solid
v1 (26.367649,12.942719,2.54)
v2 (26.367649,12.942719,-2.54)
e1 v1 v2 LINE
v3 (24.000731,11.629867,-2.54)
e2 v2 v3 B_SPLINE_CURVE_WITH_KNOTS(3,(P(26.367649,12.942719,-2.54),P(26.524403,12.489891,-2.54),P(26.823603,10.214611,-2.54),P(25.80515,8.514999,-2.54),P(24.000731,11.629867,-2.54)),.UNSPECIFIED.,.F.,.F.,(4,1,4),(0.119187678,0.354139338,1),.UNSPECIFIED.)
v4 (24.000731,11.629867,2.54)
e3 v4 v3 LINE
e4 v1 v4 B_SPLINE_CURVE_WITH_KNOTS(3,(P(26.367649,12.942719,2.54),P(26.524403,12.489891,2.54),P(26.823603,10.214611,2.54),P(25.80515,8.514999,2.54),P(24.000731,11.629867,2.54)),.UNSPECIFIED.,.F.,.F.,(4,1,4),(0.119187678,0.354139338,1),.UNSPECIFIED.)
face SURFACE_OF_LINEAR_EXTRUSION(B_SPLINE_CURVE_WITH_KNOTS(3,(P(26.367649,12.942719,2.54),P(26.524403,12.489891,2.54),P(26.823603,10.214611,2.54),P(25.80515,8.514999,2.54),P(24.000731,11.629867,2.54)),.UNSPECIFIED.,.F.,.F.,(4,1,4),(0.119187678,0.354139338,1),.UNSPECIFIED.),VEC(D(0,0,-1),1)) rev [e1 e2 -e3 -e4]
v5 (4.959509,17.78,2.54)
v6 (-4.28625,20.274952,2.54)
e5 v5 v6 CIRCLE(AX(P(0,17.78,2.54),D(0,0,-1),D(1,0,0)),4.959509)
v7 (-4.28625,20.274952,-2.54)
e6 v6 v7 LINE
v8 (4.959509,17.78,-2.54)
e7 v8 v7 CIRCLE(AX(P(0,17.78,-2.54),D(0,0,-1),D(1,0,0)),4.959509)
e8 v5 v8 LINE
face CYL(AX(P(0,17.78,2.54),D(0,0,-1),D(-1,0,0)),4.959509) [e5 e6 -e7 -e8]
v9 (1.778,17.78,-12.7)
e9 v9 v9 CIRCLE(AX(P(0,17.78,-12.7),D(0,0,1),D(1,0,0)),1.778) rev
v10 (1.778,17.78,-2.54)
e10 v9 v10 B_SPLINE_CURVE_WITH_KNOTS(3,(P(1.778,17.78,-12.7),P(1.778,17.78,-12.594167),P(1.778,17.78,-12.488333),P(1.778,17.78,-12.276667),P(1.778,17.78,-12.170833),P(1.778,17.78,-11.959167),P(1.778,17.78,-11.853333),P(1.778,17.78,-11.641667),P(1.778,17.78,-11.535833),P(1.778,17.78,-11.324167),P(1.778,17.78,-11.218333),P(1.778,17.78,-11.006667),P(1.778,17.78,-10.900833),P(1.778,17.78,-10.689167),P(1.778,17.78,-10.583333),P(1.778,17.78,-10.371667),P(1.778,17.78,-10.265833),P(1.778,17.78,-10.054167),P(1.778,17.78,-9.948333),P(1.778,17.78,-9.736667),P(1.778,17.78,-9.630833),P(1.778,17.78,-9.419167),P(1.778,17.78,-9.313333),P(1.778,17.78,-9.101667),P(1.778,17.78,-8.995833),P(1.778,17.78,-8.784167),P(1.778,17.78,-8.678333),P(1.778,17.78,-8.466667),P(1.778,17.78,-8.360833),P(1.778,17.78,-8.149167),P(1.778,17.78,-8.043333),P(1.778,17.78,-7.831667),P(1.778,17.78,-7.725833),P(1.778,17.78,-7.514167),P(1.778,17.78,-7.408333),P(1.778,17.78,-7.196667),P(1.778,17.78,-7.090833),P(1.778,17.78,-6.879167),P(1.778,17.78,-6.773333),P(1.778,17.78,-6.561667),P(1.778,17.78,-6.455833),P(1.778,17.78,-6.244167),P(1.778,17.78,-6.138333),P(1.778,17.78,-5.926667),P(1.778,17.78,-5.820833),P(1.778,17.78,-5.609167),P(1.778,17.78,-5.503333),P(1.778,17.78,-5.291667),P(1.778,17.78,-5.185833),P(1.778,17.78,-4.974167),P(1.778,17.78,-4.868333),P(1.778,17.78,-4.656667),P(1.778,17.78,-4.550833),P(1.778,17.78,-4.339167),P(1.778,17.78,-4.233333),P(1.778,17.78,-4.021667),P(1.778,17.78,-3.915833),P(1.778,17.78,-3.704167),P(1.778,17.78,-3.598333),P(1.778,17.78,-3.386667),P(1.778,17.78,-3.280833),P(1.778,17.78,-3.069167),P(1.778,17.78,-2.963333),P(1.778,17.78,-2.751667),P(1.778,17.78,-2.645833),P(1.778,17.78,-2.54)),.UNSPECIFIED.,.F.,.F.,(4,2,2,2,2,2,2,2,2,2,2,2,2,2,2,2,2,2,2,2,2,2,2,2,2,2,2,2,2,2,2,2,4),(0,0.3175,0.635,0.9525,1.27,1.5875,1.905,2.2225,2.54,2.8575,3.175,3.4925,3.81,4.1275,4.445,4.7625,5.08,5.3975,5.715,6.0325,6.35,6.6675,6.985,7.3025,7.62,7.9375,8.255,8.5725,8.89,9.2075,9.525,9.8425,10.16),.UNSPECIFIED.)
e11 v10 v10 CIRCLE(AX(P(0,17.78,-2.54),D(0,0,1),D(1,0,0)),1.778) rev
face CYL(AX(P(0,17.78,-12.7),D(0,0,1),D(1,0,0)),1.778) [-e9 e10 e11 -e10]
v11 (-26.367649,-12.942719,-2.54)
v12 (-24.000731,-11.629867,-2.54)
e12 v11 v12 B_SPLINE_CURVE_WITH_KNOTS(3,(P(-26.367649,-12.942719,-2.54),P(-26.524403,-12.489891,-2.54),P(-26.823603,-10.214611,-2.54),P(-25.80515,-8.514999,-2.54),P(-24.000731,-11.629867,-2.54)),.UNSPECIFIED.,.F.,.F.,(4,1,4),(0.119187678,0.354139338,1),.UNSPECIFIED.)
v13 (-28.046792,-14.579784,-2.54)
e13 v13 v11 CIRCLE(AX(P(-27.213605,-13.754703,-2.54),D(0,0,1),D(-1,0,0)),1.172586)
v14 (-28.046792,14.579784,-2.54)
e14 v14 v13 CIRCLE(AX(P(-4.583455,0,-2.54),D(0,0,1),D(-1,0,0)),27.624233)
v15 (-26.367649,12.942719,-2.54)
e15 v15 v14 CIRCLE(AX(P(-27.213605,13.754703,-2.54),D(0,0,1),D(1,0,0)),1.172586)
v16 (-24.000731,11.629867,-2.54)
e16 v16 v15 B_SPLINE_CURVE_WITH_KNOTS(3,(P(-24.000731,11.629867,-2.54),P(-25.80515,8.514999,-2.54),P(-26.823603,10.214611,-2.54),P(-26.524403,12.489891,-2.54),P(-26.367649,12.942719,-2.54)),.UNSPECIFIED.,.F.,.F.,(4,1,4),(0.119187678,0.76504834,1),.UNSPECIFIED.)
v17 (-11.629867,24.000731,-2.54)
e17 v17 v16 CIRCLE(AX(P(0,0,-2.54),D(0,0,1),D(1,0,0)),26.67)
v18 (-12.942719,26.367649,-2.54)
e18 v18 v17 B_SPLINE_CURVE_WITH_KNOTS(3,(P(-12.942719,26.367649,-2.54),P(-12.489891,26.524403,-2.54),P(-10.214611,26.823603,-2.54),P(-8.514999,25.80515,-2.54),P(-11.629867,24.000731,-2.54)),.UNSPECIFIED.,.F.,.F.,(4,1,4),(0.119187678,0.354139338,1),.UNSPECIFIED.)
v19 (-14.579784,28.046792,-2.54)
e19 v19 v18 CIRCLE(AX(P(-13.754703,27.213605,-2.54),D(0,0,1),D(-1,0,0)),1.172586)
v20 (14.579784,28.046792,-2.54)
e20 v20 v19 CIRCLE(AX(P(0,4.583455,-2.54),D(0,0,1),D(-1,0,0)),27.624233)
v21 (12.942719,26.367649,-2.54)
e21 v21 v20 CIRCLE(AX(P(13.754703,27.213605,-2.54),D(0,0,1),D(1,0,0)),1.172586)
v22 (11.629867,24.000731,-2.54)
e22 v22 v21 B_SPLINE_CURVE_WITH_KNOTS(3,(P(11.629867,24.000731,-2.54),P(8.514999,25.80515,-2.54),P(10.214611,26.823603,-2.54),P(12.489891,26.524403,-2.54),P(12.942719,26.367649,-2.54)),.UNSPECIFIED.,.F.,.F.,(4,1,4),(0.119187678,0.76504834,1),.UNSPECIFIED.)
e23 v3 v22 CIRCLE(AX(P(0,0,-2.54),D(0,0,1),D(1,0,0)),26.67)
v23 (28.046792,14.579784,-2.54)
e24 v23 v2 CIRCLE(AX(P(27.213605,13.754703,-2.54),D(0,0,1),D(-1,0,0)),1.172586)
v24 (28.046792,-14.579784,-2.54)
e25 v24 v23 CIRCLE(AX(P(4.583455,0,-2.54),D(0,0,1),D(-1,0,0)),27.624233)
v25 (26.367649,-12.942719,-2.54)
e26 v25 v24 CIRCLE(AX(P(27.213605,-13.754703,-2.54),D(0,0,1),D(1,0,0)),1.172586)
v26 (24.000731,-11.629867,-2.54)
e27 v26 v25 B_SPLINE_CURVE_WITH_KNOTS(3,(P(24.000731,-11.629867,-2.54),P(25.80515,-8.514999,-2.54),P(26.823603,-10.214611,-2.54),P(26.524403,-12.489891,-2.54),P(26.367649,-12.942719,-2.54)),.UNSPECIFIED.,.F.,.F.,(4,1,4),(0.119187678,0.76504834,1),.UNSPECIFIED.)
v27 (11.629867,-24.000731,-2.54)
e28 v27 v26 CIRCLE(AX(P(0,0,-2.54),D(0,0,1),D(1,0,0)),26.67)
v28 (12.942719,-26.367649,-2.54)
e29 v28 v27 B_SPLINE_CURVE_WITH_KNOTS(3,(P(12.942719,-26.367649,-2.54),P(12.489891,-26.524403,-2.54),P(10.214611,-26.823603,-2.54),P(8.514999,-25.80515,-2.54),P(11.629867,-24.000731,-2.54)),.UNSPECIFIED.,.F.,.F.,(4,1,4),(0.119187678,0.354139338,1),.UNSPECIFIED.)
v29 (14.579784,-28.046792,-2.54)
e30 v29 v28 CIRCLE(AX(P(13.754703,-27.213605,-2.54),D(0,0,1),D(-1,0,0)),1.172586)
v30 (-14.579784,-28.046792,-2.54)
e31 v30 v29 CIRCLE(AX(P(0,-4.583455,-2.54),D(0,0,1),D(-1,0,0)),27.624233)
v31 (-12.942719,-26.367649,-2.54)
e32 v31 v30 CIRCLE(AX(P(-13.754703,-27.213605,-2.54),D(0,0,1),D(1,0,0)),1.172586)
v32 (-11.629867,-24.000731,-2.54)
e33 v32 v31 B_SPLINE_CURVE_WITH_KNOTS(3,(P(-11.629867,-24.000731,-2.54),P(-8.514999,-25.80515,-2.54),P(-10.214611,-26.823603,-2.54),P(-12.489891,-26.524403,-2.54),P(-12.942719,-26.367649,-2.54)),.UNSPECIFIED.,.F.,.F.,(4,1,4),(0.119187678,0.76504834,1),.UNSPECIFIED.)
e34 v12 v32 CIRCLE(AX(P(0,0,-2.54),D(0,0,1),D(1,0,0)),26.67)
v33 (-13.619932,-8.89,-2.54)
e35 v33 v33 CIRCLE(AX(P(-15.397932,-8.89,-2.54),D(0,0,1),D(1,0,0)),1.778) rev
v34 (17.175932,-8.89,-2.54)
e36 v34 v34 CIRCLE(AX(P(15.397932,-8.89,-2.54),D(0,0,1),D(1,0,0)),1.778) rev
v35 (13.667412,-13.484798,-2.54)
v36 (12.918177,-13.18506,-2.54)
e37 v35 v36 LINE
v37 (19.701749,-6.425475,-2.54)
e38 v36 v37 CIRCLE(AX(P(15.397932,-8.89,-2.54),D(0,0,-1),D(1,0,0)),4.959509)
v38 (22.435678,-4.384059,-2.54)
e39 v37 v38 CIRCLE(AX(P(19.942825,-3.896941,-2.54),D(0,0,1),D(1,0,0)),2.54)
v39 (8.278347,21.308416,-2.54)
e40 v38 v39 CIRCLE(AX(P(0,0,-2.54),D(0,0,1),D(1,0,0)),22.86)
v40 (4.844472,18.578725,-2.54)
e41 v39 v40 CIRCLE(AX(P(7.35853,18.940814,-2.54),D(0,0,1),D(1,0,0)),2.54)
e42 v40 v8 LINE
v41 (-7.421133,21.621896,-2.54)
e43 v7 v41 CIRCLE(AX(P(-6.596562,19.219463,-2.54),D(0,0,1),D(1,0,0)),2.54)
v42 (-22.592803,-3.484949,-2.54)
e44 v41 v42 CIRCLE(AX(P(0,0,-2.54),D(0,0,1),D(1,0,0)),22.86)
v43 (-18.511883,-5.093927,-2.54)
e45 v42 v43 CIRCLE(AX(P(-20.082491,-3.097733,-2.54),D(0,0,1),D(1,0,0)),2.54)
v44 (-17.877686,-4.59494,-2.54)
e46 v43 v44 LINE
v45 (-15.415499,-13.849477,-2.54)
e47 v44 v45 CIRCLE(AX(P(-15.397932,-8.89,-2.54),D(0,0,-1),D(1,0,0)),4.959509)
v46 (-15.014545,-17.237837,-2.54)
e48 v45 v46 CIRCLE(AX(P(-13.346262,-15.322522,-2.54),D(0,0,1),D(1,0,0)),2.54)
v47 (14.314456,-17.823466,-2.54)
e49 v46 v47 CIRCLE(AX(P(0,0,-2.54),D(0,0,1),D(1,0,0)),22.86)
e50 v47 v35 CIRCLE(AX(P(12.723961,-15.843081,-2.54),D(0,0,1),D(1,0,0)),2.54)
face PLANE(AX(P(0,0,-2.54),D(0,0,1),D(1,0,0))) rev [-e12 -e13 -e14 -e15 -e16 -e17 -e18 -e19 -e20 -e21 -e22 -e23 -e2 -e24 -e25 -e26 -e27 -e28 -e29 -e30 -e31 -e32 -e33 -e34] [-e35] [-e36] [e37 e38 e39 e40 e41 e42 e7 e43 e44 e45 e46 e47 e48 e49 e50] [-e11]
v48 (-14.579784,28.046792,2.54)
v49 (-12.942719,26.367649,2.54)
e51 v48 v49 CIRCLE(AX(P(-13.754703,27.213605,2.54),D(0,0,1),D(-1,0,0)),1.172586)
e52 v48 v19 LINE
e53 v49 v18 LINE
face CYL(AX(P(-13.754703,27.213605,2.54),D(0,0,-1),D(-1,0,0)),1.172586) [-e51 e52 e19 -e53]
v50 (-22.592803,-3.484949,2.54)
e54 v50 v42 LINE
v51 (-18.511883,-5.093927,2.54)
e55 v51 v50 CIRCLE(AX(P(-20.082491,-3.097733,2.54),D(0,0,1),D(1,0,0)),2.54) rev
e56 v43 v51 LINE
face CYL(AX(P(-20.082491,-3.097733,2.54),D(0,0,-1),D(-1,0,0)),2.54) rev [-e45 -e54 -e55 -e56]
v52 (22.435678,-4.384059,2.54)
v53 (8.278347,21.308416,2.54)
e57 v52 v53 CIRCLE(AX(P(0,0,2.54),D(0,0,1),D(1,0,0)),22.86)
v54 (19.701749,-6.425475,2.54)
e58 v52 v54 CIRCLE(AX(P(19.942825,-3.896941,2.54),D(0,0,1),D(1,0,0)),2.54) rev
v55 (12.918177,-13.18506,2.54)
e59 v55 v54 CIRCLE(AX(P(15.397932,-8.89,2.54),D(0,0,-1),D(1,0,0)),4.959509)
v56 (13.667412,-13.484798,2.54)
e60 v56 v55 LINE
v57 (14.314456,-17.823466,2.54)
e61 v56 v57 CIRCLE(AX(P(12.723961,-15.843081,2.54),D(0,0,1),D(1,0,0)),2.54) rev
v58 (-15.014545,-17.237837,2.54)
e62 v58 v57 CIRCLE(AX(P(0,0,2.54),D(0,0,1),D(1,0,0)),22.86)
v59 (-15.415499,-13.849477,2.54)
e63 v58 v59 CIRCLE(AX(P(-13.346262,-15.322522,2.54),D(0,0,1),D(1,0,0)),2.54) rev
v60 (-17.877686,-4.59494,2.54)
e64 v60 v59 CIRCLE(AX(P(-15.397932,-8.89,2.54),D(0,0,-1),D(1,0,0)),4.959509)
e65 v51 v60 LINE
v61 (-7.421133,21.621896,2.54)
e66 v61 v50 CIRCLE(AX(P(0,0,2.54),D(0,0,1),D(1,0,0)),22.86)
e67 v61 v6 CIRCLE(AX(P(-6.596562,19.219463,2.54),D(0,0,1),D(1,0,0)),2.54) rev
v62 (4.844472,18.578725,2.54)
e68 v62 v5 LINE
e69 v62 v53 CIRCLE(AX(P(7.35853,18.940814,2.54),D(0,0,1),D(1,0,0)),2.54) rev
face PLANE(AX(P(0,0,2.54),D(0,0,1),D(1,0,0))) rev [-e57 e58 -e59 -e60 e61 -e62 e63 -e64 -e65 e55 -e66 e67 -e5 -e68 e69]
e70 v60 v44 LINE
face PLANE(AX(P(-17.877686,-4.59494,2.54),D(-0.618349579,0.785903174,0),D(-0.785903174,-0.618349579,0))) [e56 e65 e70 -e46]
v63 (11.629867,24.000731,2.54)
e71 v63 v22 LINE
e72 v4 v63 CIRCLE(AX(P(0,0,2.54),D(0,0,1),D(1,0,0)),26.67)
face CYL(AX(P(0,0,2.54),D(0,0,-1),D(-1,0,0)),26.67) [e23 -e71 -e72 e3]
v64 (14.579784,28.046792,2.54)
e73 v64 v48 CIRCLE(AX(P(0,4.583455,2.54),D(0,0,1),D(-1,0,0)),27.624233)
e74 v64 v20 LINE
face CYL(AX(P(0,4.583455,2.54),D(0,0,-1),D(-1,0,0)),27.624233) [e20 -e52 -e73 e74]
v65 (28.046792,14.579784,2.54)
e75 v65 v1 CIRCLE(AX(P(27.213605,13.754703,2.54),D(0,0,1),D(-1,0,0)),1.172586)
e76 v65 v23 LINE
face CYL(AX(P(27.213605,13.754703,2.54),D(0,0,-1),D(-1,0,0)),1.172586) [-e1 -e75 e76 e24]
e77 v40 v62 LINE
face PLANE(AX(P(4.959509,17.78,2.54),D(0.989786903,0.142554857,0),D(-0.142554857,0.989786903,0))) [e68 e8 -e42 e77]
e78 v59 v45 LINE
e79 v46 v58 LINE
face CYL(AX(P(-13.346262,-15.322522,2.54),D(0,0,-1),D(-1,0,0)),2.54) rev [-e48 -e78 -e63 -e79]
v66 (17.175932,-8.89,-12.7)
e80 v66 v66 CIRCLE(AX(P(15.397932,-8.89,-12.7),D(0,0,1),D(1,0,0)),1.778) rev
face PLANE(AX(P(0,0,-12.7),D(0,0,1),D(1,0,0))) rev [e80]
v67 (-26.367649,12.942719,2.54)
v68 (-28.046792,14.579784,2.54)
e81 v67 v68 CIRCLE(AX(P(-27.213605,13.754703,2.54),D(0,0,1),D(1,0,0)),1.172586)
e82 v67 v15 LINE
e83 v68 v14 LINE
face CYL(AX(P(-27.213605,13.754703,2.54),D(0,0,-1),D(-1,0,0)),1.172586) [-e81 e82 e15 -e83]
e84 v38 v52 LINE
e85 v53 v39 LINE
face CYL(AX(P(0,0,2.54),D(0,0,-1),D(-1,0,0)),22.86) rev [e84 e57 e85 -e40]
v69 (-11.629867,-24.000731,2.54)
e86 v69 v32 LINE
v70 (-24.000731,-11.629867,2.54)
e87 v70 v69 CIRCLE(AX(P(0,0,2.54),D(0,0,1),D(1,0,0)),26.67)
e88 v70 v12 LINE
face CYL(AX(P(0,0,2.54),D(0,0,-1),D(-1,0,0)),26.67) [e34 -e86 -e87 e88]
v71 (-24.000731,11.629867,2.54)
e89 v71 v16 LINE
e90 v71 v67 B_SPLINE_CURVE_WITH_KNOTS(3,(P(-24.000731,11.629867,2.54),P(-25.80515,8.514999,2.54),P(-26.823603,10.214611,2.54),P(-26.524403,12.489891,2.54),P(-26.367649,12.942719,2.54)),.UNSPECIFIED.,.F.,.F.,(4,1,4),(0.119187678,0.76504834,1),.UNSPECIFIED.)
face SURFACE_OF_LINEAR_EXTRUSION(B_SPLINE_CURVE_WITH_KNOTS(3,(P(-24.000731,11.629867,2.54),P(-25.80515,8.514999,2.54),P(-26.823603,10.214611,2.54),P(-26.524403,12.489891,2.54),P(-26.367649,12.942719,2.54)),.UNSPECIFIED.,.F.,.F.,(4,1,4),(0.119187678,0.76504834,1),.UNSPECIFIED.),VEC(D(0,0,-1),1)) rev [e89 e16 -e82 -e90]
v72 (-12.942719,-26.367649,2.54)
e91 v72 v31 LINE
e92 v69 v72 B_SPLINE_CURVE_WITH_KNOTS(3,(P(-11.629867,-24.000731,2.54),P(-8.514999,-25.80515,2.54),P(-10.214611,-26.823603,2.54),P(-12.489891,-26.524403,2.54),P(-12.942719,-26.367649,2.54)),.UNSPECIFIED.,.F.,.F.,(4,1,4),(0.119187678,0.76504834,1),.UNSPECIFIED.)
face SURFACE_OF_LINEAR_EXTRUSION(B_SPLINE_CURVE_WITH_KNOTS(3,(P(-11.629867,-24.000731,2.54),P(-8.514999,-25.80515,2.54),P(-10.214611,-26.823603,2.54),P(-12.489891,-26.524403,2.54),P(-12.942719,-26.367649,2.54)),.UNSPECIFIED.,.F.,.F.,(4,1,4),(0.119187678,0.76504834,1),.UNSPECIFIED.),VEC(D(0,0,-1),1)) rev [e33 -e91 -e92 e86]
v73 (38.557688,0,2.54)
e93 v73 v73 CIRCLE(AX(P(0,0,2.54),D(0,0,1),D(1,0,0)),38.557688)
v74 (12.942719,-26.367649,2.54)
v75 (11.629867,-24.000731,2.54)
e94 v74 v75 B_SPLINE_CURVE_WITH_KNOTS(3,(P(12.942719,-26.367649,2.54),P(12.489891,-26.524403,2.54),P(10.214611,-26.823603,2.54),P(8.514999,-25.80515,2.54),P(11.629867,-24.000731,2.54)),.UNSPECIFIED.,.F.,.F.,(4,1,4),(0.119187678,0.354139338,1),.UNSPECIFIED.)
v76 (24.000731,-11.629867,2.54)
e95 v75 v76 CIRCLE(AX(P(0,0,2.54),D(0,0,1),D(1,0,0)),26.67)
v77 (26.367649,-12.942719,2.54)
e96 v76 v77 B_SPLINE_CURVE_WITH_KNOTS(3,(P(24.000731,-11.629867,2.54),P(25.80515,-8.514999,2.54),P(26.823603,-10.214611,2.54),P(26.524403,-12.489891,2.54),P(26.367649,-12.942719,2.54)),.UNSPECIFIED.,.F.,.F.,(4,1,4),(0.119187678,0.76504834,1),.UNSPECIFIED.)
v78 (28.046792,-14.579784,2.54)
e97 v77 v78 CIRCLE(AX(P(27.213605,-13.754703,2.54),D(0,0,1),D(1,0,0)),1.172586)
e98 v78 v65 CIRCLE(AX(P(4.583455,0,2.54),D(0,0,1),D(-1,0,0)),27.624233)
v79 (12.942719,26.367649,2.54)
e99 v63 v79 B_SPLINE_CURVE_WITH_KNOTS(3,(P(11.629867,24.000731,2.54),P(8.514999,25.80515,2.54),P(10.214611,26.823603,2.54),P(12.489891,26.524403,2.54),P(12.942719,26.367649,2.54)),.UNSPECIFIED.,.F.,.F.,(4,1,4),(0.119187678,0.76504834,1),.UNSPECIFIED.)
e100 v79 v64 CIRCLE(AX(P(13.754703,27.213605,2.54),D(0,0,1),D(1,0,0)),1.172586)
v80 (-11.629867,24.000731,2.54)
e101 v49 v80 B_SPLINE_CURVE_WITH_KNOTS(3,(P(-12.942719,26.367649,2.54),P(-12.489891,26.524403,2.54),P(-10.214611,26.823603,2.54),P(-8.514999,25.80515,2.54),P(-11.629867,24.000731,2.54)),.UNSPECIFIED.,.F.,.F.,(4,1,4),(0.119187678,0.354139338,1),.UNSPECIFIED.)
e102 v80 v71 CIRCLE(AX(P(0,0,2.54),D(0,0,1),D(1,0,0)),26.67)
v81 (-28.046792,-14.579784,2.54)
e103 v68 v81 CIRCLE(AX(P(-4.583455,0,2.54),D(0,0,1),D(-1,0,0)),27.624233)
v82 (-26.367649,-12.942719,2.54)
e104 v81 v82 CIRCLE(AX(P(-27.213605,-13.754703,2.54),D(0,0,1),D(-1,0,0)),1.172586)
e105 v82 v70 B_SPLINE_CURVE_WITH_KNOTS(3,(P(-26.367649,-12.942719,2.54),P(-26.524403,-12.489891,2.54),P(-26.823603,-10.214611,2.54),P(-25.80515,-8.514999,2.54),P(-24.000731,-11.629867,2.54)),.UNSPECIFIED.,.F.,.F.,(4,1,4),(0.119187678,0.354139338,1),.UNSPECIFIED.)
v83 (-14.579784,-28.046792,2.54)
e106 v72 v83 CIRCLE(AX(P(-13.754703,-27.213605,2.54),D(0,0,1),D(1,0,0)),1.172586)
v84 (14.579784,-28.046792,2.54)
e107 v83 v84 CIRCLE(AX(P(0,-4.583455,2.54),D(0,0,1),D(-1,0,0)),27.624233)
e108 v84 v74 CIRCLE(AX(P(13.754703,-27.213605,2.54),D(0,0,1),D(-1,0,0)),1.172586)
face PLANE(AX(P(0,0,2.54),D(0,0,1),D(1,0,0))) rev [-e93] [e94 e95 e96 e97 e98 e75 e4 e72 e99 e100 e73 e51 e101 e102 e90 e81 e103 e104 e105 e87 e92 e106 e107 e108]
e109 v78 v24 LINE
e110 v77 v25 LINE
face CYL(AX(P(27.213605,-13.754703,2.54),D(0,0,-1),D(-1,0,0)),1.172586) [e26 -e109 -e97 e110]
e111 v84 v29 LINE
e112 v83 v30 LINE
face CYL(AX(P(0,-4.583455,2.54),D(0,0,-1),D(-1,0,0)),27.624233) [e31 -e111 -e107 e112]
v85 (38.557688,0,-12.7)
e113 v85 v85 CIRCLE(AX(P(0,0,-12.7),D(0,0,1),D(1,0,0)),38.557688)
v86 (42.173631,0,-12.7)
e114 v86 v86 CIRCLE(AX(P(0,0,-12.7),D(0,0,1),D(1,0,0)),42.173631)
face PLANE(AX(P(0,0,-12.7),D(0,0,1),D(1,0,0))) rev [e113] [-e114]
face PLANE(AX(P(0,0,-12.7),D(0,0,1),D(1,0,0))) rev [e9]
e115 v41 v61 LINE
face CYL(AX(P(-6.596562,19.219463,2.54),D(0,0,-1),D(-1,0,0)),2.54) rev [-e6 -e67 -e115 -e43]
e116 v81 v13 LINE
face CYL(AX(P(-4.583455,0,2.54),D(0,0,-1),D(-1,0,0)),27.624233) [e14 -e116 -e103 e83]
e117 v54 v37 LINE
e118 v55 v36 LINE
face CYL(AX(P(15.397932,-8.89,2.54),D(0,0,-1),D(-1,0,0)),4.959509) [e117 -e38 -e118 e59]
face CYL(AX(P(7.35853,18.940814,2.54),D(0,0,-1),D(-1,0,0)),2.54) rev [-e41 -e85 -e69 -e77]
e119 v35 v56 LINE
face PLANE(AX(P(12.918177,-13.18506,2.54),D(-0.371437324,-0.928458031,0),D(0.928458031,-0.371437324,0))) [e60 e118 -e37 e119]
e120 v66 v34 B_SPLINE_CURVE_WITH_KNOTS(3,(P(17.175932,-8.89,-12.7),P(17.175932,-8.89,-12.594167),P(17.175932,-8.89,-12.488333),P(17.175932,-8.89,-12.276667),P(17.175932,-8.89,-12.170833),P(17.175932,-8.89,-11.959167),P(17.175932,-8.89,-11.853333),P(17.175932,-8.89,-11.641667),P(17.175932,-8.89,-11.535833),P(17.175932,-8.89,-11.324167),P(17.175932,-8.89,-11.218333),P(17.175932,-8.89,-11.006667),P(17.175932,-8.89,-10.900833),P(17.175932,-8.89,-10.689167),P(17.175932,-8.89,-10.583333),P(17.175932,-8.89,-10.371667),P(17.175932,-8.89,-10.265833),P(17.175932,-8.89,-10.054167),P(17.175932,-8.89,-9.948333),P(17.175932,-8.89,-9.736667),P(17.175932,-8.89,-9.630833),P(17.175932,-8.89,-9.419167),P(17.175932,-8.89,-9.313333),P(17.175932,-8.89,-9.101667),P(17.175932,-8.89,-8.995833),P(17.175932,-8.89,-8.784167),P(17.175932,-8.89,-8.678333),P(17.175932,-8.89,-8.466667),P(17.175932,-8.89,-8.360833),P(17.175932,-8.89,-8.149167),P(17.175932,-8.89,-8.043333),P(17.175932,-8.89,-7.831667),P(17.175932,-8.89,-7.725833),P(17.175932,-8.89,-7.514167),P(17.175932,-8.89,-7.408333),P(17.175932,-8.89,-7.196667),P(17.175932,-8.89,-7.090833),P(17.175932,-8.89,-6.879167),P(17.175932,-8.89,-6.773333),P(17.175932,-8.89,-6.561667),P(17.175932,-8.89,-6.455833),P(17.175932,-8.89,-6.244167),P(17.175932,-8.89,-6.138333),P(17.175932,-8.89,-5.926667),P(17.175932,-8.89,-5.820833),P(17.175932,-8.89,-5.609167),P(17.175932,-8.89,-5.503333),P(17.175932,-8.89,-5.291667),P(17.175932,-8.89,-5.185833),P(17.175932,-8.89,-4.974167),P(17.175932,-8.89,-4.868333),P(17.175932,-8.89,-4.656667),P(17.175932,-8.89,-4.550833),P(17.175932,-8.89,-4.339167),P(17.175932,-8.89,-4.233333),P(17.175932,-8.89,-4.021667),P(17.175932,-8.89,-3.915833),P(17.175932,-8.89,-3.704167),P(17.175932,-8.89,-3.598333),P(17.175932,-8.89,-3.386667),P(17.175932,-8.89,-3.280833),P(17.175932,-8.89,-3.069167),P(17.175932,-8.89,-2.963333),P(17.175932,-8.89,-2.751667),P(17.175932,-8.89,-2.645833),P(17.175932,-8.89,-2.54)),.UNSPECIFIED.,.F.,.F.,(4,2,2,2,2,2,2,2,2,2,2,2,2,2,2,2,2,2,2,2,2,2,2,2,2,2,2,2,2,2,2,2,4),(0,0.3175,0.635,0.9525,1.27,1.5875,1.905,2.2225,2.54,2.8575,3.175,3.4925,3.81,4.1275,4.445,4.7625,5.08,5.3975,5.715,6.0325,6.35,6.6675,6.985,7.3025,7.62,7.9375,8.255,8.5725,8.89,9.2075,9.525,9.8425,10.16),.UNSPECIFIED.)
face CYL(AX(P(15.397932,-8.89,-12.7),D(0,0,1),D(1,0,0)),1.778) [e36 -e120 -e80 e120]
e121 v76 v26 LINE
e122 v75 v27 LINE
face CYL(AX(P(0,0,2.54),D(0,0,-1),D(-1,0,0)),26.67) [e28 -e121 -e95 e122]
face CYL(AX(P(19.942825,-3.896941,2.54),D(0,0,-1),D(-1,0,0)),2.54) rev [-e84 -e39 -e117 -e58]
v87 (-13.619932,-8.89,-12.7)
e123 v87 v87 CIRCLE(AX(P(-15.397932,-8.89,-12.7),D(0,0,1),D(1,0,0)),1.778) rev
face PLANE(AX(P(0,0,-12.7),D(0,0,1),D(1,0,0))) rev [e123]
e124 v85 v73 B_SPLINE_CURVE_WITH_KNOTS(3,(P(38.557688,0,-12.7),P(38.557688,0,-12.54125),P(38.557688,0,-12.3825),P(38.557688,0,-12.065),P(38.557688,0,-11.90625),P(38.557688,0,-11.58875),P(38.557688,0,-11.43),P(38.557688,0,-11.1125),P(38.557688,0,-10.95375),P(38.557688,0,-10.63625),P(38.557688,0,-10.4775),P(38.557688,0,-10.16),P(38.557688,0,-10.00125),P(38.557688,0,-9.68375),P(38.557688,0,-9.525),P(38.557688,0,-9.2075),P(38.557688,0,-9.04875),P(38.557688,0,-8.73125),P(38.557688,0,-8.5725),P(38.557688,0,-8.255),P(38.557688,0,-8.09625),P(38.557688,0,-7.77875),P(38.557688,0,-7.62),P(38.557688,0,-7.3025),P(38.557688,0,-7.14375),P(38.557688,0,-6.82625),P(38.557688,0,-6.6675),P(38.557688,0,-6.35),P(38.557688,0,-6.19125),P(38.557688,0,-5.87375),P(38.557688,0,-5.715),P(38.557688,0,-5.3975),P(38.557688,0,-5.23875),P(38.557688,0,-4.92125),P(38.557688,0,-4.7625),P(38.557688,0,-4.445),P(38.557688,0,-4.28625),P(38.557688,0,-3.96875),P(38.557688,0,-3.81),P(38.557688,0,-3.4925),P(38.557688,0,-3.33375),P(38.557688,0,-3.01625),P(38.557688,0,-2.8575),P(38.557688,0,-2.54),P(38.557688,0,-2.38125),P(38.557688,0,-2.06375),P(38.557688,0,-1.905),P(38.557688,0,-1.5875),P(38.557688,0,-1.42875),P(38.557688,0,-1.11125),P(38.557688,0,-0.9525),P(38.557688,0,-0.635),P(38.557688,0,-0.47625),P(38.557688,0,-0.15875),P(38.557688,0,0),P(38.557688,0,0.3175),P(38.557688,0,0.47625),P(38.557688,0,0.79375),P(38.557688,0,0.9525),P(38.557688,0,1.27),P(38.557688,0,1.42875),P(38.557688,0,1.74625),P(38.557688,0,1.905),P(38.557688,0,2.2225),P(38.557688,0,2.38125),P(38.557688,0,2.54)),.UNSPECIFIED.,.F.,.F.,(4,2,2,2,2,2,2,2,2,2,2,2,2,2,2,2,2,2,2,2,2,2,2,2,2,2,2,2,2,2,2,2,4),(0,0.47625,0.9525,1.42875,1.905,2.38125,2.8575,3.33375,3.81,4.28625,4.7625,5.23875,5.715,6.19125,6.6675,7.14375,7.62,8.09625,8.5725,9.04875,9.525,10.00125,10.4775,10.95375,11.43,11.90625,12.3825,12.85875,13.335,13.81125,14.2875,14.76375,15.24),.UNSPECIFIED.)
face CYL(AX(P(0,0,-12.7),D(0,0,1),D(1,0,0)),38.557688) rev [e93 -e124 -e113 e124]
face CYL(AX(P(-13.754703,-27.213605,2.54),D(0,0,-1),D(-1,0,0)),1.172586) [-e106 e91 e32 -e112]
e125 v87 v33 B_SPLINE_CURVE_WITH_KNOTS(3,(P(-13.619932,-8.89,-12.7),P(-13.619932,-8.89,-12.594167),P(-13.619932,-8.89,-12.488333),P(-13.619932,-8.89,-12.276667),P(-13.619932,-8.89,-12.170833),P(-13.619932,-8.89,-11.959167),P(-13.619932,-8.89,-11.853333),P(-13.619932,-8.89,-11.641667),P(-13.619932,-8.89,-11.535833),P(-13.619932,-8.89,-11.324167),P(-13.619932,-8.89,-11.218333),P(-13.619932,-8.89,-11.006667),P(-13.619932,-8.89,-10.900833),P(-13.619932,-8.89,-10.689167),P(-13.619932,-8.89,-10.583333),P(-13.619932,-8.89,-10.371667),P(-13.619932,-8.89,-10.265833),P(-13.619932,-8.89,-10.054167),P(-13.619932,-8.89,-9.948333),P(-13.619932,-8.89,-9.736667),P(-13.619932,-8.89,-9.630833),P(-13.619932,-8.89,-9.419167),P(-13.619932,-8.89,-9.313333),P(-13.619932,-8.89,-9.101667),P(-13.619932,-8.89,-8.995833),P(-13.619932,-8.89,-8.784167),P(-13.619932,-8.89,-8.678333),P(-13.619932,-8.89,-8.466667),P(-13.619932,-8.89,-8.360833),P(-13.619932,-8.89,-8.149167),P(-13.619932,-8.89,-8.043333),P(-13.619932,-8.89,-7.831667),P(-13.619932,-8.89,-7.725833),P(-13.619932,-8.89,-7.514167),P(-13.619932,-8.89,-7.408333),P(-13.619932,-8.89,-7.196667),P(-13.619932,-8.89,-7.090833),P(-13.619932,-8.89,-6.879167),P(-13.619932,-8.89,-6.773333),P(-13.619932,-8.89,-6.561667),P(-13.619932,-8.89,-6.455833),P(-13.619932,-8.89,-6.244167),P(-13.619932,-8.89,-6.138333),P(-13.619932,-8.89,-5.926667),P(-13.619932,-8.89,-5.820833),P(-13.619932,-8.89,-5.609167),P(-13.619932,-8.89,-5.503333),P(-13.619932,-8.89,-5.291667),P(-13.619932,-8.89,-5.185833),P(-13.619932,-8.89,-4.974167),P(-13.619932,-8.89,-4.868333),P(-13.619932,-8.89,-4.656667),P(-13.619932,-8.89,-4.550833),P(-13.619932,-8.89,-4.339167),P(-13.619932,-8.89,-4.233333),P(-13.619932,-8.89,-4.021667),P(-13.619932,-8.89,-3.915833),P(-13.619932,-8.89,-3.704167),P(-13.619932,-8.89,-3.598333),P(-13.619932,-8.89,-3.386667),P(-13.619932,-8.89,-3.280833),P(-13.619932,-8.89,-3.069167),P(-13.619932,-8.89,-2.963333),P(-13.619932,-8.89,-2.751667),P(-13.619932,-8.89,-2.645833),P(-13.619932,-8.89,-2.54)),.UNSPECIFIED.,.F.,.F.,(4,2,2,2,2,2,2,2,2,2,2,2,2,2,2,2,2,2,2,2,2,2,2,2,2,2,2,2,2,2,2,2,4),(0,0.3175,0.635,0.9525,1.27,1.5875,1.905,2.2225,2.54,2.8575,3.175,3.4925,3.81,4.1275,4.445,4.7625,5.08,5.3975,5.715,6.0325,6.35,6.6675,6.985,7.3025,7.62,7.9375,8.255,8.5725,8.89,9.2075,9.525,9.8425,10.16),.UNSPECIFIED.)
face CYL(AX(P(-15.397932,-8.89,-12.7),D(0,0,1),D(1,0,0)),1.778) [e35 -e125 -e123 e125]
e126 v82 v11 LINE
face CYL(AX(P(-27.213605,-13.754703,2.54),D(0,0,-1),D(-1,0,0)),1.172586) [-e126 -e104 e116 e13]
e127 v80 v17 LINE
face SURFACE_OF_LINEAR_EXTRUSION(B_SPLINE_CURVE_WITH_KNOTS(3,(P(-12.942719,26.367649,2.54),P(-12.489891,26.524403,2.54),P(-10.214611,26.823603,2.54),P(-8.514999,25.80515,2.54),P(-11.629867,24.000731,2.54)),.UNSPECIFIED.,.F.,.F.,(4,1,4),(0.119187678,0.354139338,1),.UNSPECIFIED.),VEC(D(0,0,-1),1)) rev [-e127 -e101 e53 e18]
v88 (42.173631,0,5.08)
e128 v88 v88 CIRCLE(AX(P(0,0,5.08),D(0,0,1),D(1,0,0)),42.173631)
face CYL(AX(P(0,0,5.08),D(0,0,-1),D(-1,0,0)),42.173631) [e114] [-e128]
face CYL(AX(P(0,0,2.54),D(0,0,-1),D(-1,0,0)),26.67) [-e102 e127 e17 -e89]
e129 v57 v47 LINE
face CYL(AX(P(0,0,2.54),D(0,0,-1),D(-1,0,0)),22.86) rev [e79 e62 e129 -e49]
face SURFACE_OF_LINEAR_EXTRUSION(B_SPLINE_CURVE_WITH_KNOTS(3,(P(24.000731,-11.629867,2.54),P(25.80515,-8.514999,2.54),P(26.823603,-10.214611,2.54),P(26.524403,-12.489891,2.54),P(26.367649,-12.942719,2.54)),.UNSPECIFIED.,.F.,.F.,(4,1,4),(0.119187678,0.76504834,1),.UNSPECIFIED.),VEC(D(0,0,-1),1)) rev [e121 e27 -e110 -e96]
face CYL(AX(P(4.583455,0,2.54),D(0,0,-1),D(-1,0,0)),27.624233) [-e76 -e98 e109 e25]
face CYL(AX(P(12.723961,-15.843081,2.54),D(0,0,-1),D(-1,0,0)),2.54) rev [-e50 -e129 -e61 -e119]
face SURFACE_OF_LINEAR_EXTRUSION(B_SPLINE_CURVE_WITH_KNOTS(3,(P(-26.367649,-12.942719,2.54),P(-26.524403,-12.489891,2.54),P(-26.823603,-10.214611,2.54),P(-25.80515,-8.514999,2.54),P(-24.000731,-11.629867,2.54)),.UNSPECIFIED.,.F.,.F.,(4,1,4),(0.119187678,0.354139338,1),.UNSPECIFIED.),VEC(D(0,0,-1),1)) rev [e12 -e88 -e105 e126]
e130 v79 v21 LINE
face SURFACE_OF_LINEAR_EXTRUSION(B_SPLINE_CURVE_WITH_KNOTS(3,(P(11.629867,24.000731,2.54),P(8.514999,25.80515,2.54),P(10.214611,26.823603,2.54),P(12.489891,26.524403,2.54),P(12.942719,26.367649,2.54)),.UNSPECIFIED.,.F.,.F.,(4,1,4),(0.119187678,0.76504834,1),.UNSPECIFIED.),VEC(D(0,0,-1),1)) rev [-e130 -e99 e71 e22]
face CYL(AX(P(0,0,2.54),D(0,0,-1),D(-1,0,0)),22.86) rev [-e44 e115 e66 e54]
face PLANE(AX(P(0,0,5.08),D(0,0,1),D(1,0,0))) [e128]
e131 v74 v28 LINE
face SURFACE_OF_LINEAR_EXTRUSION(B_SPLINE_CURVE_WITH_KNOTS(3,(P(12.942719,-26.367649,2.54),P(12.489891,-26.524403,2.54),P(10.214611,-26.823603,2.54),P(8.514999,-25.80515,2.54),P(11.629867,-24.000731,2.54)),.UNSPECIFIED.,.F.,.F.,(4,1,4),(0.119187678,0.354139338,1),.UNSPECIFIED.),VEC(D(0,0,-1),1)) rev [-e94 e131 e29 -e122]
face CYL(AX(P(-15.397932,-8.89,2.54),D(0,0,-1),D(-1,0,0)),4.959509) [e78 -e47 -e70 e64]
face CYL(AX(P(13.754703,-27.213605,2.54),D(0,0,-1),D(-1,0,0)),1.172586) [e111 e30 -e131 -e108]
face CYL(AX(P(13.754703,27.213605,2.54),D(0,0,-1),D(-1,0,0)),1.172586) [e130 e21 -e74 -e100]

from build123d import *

# Parameters (mm, degrees)
SKETCH1_R           = 1.778
BOSS_EXTRUDE1_DEPTH = 2.54
FILLET1_R           = 2.54
BOSS_EXTRUDE2_START = -15.24
SKETCH3_R           = 42.173631202
SKETCH3_R_2         = 38.557688222
SKETCH3_R_3         = 1.778
BOSS_EXTRUDE2_DEPTH = 15.24
SKETCH4_R           = 42.173631202
BOSS_EXTRUDE3_DEPTH = 2.54


with BuildPart() as part:
    # Sketch1 → Boss-Extrude1 (new, symmetric)
    with BuildSketch(Plane.XY):
        with BuildLine():
            ThreePointArc((23.096897519, 13.335), (18.163878776, 19.528502447), (11.629866574, 24.000731311))
            add(Edge.make_bspline(
                [(12.942718979, 26.367649013), (12.489890773, 26.524403161), (10.214611, 26.823602727), (8.514999239, 25.805149786), (11.629866574, 24.000731311)],
                knots=[0.119187678, 0.119187678, 0.119187678, 0.119187678, 0.354139338, 1, 1, 1, 1], degree=3))
            ThreePointArc((12.942718979, 26.367649013), (14.594299506, 26.395047723), (14.579783558, 28.046791715))
            ThreePointArc((14.579783558, 28.046791715), (0, 32.207688222), (-14.579783558, 28.046791715))
            ThreePointArc((-14.579783558, 28.046791715), (-14.594299506, 26.395047723), (-12.942718979, 26.367649013))
            add(Edge.make_bspline(
                [(-12.942718979, 26.367649013), (-12.489890773, 26.524403161), (-10.214611, 26.823602727), (-8.514999239, 25.805149786), (-11.629866574, 24.000731311)],
                knots=[0.119187678, 0.119187678, 0.119187678, 0.119187678, 0.354139338, 1, 1, 1, 1], degree=3))
            ThreePointArc((-11.629866574, 24.000731311), (-18.163878776, 19.528502447), (-23.096897519, 13.335))
            ThreePointArc((-23.096897519, 13.335), (-23.564242622, 12.49061126), (-24.000731311, 11.629866574))
            add(Edge.make_bspline(
                [(-26.367649013, 12.942718979), (-26.524403161, 12.489890773), (-26.823602727, 10.214611), (-25.805149786, 8.514999239), (-24.000731311, 11.629866574)],
                knots=[0.119187678, 0.119187678, 0.119187678, 0.119187678, 0.354139338, 1, 1, 1, 1], degree=3))
            ThreePointArc((-26.367649013, 12.942718979), (-26.395047723, 14.594299506), (-28.046791715, 14.579783558))
            ThreePointArc((-28.046791715, 14.579783558), (-32.207688222, 0), (-28.046791715, -14.579783558))
            ThreePointArc((-28.046791715, -14.579783558), (-26.395047723, -14.594299506), (-26.367649013, -12.942718979))
            add(Edge.make_bspline(
                [(-26.367649013, -12.942718979), (-26.524403161, -12.489890773), (-26.823602727, -10.214611), (-25.805149786, -8.514999239), (-24.000731311, -11.629866574)],
                knots=[0.119187678, 0.119187678, 0.119187678, 0.119187678, 0.354139338, 1, 1, 1, 1], degree=3))
            ThreePointArc((-24.000731311, -11.629866574), (-18.858537854, -18.858537854), (-11.629866574, -24.000731311))
            add(Edge.make_bspline(
                [(-12.942718979, -26.367649013), (-12.489890773, -26.524403161), (-10.214611, -26.823602727), (-8.514999239, -25.805149786), (-11.629866574, -24.000731311)],
                knots=[0.119187678, 0.119187678, 0.119187678, 0.119187678, 0.354139338, 1, 1, 1, 1], degree=3))
            ThreePointArc((-12.942718979, -26.367649013), (-14.594299506, -26.395047723), (-14.579783558, -28.046791715))
            ThreePointArc((-14.579783558, -28.046791715), (0, -32.207688222), (14.579783558, -28.046791715))
            ThreePointArc((14.579783558, -28.046791715), (14.594299506, -26.395047723), (12.942718979, -26.367649013))
            add(Edge.make_bspline(
                [(12.942718979, -26.367649013), (12.489890773, -26.524403161), (10.214611, -26.823602727), (8.514999239, -25.805149786), (11.629866574, -24.000731311)],
                knots=[0.119187678, 0.119187678, 0.119187678, 0.119187678, 0.354139338, 1, 1, 1, 1], degree=3))
            ThreePointArc((11.629866574, -24.000731311), (18.858537854, -18.858537854), (24.000731311, -11.629866574))
            add(Edge.make_bspline(
                [(26.367649013, -12.942718979), (26.524403161, -12.489890773), (26.823602727, -10.214611), (25.805149786, -8.514999239), (24.000731311, -11.629866574)],
                knots=[0.119187678, 0.119187678, 0.119187678, 0.119187678, 0.354139338, 1, 1, 1, 1], degree=3))
            ThreePointArc((26.367649013, -12.942718979), (26.395047723, -14.594299506), (28.046791715, -14.579783558))
            ThreePointArc((28.046791715, -14.579783558), (32.207688222, 0), (28.046791715, 14.579783558))
            ThreePointArc((28.046791715, 14.579783558), (26.395047723, 14.594299506), (26.367649013, 12.942718979))
            add(Edge.make_bspline(
                [(26.367649013, 12.942718979), (26.524403161, 12.489890773), (26.823602727, 10.214611), (25.805149786, 8.514999239), (24.000731311, 11.629866574)],
                knots=[0.119187678, 0.119187678, 0.119187678, 0.119187678, 0.354139338, 1, 1, 1, 1], degree=3))
            ThreePointArc((24.000731311, 11.629866574), (23.564242622, 12.49061126), (23.096897519, 13.335))
        make_face()
        with Locations((0, 17.78)):
            Circle(SKETCH1_R, mode=Mode.SUBTRACT)
        with Locations((15.397931679, -8.89)):
            Circle(SKETCH1_R, mode=Mode.SUBTRACT)
        with Locations((-15.397931679, -8.89)):
            Circle(SKETCH1_R, mode=Mode.SUBTRACT)
        with BuildLine():
            Line((-4.28625, 20.274952091), (-4.28625, 22.454568821))
            ThreePointArc((-4.28625, 22.454568821), (-13.24349331, 18.633021359), (-19.797340731, 11.43))
            ThreePointArc((-19.797340731, 11.43), (-22.758416501, 2.152690962), (-21.58935203, -7.515283024))
            Line((-21.58935203, -7.515283024), (-17.877685951, -4.59493961))
            ThreePointArc((-17.877685951, -4.59493961), (-10.605148477, -7.614870918), (-15.415498572, -13.849477433))
            Line((-15.415498572, -13.849477433), (-17.30310203, -14.939285797))
            ThreePointArc((-17.30310203, -14.939285797), (-9.514923191, -20.78571232), (0, -22.86))
            ThreePointArc((0, -22.86), (9.514923191, -20.78571232), (17.30310203, -14.939285797))
            Line((17.30310203, -14.939285797), (12.918177407, -13.18506039))
            ThreePointArc((12.918177407, -13.18506039), (11.8972459, -5.376892533), (19.701748572, -6.425474659))
            Line((19.701748572, -6.425474659), (21.58935203, -7.515283024))
            ThreePointArc((21.58935203, -7.515283024), (22.758416501, 2.152690962), (19.797340731, 11.43))
            ThreePointArc((19.797340731, 11.43), (13.24349331, 18.633021359), (4.28625, 22.454568821))
            Line((4.28625, 22.454568821), (4.959508544, 17.78))
            ThreePointArc((4.959508544, 17.78), (-1.292097423, 12.991763451), (-4.28625, 20.274952091))
        make_face(mode=Mode.SUBTRACT)
    extrude(amount=BOSS_EXTRUDE1_DEPTH, both=True)

    # Fillet1
    # the kernel refuses this fillet: 2.54 mm, written as the material it adds along each edge
    with BuildSketch(Plane(origin=(21.58935203, -7.515283024, 0), x_dir=(-0.8660254037844372, 0.5000000000000026, 0), z_dir=(0, 0, -1)), Plane(origin=(-17.30310203, -14.939285797, 0), x_dir=(0.8660254037844382, 0.5000000000000008, 0), z_dir=(0, 0, -1)), Plane(origin=(-4.28625, 22.454568821, 0), x_dir=(0, -1, 0), z_dir=(0, 0, -1))) as fillet1_piece_1:
        with BuildLine():
            CenterArc((3.235105636, 2.310312353), FILLET1_R, 161.0565991, 84.38964425)
            Line((0.832672738, 3.134882647), (0.78462408, 3.151374053))
            ThreePointArc((0.78462408, 3.151374053), (0.311567983, 1.595269408), (-0.049899042, 0.009525))
            Line((-0.049899042, 0.009525), (0, -0.0508))
            ThreePointArc((0, -0.0508), (1.089808365, -0.0508), (2.158506952, -0.046206247))
            Line((2.158506952, -0.046206247), (2.17961673, 0))
        make_face()
    extrude(amount=2.54)
    with BuildSketch(Plane(origin=(17.30310203, -14.939285797, 0), x_dir=(-0.7195709341275718, -0.6944189447003685, 0), z_dir=(0, 0, -1)), Plane(origin=(4.28625, 22.454568821, 0), x_dir=(0.9611699140434871, -0.2759572364291899, 0), z_dir=(0, 0, -1)), Plane(origin=(-21.58935203, -7.515283024, 0), x_dir=(-0.24159897991591575, 0.9703761811295601, 0), z_dir=(0, 0, -1))) as fillet1_piece_2:
        with BuildLine():
            CenterArc((3.922629513, 2.529497521), FILLET1_R, 155.785220789, 119.426923656)
            Line((1.60611307, 3.571299597), (1.559782741, 3.592135639))
            Line((1.559782741, 3.592135639), (-0.046330329, 0.020836042))
            Line((-0.046330329, 0.020836042), (-0.004614858, -0.05058995))
            ThreePointArc((-0.004614858, -0.05058995), (2.076686213, -0.145322312), (4.157987284, -0.05058995))
            Line((4.157987284, -0.05058995), (4.153372426, 0))
        make_face()
    extrude(amount=2.54)
    with BuildSketch(Plane(origin=(-21.58935203, -7.515283024, 0), x_dir=(-0.24159897991591575, 0.9703761811295601, 0), z_dir=(0, 0, 1)), Plane(origin=(4.28625, 22.454568821, 0), x_dir=(0.9611699140434871, -0.2759572364291899, 0), z_dir=(0, 0, 1)), Plane(origin=(17.30310203, -14.939285797, 0), x_dir=(-0.7195709341275718, -0.6944189447003685, 0), z_dir=(0, 0, 1))) as fillet1_piece_3:
        with BuildLine():
            CenterArc((3.922629513, -2.529497521), FILLET1_R, 84.787855555, 119.426923656)
            Line((1.60611307, -3.571299597), (1.559782741, -3.592135639))
            Line((1.559782741, -3.592135639), (-0.046330329, -0.020836042))
            Line((-0.046330329, -0.020836042), (-0.004614858, 0.05058995))
            ThreePointArc((-0.004614858, 0.05058995), (2.076686213, 0.145322312), (4.157987284, 0.05058995))
            Line((4.157987284, 0.05058995), (4.153372426, 0))
        make_face()
    extrude(amount=2.54)
    with BuildSketch(Plane(origin=(-4.28625, 22.454568821, 0), x_dir=(0, -1, 0), z_dir=(0, 0, 1)), Plane(origin=(-17.30310203, -14.939285797, 0), x_dir=(0.8660254037844382, 0.5000000000000008, 0), z_dir=(0, 0, 1)), Plane(origin=(21.58935203, -7.515283024, 0), x_dir=(-0.8660254037844372, 0.5000000000000026, 0), z_dir=(0, 0, 1))) as fillet1_piece_4:
        with BuildLine():
            CenterArc((3.235105636, -2.310312353), FILLET1_R, 114.55375665, 84.38964425)
            Line((0.832672738, -3.134882647), (0.78462408, -3.151374053))
            ThreePointArc((0.78462408, -3.151374053), (0.311567983, -1.595269408), (-0.049899042, -0.009525))
            Line((-0.049899042, -0.009525), (0, 0.0508))
            ThreePointArc((0, 0.0508), (1.089808365, 0.0508), (2.158506952, 0.046206247))
            Line((2.158506952, 0.046206247), (2.17961673, 0))
        make_face()
    extrude(amount=2.54)

    # Sketch3 → Boss-Extrude2 (add)
    # profile 1 of 4: a face of its own
    with BuildSketch(Plane.XY.offset(2.54).offset(BOSS_EXTRUDE2_START)):
        Circle(SKETCH3_R)
        Circle(SKETCH3_R_2, mode=Mode.SUBTRACT)
    # profile 2 of 4: a face of its own
    with BuildSketch(Plane.XY.offset(2.54).offset(BOSS_EXTRUDE2_START)):
        with Locations((15.397931679, -8.89)):
            Circle(SKETCH3_R_3)
    # profile 3 of 4: a face of its own
    with BuildSketch(Plane.XY.offset(2.54).offset(BOSS_EXTRUDE2_START)):
        with Locations((-15.397931679, -8.89)):
            Circle(SKETCH3_R_3)
    # profile 4 of 4: a face of its own
    with BuildSketch(Plane.XY.offset(2.54).offset(BOSS_EXTRUDE2_START)):
        with Locations((0, 17.78)):
            Circle(SKETCH3_R_3)
    extrude(amount=BOSS_EXTRUDE2_DEPTH)


with BuildPart() as boss_extrude2_piece_1:
    # of the separate pieces the step leaves, piece 1, a body of its own (boss_extrude2_pieces)
    add(part.part.solids().sort_by_distance((42.173631202, 0, -12.7))[0])



with BuildPart() as boss_extrude2_piece_2:
    # of the separate pieces the step leaves, piece 2, a body of its own (boss_extrude2_pieces)
    add(part.part.solids().sort_by_distance((-18.511883244, -5.093926817, -2.54))[0])


with BuildPart() as boss_extrude2_piece_1_1:
    add(boss_extrude2_piece_1.part)

    add(boss_extrude2_piece_2.part)  # Boss-Extrude3 merges Boss-Extrude2 piece 2
    # Sketch4 → Boss-Extrude3 (add)
    with BuildSketch(Plane.XY.offset(2.54)):
        Circle(SKETCH4_R)
    extrude(amount=BOSS_EXTRUDE3_DEPTH)


solid = boss_extrude2_piece_1_1.part
